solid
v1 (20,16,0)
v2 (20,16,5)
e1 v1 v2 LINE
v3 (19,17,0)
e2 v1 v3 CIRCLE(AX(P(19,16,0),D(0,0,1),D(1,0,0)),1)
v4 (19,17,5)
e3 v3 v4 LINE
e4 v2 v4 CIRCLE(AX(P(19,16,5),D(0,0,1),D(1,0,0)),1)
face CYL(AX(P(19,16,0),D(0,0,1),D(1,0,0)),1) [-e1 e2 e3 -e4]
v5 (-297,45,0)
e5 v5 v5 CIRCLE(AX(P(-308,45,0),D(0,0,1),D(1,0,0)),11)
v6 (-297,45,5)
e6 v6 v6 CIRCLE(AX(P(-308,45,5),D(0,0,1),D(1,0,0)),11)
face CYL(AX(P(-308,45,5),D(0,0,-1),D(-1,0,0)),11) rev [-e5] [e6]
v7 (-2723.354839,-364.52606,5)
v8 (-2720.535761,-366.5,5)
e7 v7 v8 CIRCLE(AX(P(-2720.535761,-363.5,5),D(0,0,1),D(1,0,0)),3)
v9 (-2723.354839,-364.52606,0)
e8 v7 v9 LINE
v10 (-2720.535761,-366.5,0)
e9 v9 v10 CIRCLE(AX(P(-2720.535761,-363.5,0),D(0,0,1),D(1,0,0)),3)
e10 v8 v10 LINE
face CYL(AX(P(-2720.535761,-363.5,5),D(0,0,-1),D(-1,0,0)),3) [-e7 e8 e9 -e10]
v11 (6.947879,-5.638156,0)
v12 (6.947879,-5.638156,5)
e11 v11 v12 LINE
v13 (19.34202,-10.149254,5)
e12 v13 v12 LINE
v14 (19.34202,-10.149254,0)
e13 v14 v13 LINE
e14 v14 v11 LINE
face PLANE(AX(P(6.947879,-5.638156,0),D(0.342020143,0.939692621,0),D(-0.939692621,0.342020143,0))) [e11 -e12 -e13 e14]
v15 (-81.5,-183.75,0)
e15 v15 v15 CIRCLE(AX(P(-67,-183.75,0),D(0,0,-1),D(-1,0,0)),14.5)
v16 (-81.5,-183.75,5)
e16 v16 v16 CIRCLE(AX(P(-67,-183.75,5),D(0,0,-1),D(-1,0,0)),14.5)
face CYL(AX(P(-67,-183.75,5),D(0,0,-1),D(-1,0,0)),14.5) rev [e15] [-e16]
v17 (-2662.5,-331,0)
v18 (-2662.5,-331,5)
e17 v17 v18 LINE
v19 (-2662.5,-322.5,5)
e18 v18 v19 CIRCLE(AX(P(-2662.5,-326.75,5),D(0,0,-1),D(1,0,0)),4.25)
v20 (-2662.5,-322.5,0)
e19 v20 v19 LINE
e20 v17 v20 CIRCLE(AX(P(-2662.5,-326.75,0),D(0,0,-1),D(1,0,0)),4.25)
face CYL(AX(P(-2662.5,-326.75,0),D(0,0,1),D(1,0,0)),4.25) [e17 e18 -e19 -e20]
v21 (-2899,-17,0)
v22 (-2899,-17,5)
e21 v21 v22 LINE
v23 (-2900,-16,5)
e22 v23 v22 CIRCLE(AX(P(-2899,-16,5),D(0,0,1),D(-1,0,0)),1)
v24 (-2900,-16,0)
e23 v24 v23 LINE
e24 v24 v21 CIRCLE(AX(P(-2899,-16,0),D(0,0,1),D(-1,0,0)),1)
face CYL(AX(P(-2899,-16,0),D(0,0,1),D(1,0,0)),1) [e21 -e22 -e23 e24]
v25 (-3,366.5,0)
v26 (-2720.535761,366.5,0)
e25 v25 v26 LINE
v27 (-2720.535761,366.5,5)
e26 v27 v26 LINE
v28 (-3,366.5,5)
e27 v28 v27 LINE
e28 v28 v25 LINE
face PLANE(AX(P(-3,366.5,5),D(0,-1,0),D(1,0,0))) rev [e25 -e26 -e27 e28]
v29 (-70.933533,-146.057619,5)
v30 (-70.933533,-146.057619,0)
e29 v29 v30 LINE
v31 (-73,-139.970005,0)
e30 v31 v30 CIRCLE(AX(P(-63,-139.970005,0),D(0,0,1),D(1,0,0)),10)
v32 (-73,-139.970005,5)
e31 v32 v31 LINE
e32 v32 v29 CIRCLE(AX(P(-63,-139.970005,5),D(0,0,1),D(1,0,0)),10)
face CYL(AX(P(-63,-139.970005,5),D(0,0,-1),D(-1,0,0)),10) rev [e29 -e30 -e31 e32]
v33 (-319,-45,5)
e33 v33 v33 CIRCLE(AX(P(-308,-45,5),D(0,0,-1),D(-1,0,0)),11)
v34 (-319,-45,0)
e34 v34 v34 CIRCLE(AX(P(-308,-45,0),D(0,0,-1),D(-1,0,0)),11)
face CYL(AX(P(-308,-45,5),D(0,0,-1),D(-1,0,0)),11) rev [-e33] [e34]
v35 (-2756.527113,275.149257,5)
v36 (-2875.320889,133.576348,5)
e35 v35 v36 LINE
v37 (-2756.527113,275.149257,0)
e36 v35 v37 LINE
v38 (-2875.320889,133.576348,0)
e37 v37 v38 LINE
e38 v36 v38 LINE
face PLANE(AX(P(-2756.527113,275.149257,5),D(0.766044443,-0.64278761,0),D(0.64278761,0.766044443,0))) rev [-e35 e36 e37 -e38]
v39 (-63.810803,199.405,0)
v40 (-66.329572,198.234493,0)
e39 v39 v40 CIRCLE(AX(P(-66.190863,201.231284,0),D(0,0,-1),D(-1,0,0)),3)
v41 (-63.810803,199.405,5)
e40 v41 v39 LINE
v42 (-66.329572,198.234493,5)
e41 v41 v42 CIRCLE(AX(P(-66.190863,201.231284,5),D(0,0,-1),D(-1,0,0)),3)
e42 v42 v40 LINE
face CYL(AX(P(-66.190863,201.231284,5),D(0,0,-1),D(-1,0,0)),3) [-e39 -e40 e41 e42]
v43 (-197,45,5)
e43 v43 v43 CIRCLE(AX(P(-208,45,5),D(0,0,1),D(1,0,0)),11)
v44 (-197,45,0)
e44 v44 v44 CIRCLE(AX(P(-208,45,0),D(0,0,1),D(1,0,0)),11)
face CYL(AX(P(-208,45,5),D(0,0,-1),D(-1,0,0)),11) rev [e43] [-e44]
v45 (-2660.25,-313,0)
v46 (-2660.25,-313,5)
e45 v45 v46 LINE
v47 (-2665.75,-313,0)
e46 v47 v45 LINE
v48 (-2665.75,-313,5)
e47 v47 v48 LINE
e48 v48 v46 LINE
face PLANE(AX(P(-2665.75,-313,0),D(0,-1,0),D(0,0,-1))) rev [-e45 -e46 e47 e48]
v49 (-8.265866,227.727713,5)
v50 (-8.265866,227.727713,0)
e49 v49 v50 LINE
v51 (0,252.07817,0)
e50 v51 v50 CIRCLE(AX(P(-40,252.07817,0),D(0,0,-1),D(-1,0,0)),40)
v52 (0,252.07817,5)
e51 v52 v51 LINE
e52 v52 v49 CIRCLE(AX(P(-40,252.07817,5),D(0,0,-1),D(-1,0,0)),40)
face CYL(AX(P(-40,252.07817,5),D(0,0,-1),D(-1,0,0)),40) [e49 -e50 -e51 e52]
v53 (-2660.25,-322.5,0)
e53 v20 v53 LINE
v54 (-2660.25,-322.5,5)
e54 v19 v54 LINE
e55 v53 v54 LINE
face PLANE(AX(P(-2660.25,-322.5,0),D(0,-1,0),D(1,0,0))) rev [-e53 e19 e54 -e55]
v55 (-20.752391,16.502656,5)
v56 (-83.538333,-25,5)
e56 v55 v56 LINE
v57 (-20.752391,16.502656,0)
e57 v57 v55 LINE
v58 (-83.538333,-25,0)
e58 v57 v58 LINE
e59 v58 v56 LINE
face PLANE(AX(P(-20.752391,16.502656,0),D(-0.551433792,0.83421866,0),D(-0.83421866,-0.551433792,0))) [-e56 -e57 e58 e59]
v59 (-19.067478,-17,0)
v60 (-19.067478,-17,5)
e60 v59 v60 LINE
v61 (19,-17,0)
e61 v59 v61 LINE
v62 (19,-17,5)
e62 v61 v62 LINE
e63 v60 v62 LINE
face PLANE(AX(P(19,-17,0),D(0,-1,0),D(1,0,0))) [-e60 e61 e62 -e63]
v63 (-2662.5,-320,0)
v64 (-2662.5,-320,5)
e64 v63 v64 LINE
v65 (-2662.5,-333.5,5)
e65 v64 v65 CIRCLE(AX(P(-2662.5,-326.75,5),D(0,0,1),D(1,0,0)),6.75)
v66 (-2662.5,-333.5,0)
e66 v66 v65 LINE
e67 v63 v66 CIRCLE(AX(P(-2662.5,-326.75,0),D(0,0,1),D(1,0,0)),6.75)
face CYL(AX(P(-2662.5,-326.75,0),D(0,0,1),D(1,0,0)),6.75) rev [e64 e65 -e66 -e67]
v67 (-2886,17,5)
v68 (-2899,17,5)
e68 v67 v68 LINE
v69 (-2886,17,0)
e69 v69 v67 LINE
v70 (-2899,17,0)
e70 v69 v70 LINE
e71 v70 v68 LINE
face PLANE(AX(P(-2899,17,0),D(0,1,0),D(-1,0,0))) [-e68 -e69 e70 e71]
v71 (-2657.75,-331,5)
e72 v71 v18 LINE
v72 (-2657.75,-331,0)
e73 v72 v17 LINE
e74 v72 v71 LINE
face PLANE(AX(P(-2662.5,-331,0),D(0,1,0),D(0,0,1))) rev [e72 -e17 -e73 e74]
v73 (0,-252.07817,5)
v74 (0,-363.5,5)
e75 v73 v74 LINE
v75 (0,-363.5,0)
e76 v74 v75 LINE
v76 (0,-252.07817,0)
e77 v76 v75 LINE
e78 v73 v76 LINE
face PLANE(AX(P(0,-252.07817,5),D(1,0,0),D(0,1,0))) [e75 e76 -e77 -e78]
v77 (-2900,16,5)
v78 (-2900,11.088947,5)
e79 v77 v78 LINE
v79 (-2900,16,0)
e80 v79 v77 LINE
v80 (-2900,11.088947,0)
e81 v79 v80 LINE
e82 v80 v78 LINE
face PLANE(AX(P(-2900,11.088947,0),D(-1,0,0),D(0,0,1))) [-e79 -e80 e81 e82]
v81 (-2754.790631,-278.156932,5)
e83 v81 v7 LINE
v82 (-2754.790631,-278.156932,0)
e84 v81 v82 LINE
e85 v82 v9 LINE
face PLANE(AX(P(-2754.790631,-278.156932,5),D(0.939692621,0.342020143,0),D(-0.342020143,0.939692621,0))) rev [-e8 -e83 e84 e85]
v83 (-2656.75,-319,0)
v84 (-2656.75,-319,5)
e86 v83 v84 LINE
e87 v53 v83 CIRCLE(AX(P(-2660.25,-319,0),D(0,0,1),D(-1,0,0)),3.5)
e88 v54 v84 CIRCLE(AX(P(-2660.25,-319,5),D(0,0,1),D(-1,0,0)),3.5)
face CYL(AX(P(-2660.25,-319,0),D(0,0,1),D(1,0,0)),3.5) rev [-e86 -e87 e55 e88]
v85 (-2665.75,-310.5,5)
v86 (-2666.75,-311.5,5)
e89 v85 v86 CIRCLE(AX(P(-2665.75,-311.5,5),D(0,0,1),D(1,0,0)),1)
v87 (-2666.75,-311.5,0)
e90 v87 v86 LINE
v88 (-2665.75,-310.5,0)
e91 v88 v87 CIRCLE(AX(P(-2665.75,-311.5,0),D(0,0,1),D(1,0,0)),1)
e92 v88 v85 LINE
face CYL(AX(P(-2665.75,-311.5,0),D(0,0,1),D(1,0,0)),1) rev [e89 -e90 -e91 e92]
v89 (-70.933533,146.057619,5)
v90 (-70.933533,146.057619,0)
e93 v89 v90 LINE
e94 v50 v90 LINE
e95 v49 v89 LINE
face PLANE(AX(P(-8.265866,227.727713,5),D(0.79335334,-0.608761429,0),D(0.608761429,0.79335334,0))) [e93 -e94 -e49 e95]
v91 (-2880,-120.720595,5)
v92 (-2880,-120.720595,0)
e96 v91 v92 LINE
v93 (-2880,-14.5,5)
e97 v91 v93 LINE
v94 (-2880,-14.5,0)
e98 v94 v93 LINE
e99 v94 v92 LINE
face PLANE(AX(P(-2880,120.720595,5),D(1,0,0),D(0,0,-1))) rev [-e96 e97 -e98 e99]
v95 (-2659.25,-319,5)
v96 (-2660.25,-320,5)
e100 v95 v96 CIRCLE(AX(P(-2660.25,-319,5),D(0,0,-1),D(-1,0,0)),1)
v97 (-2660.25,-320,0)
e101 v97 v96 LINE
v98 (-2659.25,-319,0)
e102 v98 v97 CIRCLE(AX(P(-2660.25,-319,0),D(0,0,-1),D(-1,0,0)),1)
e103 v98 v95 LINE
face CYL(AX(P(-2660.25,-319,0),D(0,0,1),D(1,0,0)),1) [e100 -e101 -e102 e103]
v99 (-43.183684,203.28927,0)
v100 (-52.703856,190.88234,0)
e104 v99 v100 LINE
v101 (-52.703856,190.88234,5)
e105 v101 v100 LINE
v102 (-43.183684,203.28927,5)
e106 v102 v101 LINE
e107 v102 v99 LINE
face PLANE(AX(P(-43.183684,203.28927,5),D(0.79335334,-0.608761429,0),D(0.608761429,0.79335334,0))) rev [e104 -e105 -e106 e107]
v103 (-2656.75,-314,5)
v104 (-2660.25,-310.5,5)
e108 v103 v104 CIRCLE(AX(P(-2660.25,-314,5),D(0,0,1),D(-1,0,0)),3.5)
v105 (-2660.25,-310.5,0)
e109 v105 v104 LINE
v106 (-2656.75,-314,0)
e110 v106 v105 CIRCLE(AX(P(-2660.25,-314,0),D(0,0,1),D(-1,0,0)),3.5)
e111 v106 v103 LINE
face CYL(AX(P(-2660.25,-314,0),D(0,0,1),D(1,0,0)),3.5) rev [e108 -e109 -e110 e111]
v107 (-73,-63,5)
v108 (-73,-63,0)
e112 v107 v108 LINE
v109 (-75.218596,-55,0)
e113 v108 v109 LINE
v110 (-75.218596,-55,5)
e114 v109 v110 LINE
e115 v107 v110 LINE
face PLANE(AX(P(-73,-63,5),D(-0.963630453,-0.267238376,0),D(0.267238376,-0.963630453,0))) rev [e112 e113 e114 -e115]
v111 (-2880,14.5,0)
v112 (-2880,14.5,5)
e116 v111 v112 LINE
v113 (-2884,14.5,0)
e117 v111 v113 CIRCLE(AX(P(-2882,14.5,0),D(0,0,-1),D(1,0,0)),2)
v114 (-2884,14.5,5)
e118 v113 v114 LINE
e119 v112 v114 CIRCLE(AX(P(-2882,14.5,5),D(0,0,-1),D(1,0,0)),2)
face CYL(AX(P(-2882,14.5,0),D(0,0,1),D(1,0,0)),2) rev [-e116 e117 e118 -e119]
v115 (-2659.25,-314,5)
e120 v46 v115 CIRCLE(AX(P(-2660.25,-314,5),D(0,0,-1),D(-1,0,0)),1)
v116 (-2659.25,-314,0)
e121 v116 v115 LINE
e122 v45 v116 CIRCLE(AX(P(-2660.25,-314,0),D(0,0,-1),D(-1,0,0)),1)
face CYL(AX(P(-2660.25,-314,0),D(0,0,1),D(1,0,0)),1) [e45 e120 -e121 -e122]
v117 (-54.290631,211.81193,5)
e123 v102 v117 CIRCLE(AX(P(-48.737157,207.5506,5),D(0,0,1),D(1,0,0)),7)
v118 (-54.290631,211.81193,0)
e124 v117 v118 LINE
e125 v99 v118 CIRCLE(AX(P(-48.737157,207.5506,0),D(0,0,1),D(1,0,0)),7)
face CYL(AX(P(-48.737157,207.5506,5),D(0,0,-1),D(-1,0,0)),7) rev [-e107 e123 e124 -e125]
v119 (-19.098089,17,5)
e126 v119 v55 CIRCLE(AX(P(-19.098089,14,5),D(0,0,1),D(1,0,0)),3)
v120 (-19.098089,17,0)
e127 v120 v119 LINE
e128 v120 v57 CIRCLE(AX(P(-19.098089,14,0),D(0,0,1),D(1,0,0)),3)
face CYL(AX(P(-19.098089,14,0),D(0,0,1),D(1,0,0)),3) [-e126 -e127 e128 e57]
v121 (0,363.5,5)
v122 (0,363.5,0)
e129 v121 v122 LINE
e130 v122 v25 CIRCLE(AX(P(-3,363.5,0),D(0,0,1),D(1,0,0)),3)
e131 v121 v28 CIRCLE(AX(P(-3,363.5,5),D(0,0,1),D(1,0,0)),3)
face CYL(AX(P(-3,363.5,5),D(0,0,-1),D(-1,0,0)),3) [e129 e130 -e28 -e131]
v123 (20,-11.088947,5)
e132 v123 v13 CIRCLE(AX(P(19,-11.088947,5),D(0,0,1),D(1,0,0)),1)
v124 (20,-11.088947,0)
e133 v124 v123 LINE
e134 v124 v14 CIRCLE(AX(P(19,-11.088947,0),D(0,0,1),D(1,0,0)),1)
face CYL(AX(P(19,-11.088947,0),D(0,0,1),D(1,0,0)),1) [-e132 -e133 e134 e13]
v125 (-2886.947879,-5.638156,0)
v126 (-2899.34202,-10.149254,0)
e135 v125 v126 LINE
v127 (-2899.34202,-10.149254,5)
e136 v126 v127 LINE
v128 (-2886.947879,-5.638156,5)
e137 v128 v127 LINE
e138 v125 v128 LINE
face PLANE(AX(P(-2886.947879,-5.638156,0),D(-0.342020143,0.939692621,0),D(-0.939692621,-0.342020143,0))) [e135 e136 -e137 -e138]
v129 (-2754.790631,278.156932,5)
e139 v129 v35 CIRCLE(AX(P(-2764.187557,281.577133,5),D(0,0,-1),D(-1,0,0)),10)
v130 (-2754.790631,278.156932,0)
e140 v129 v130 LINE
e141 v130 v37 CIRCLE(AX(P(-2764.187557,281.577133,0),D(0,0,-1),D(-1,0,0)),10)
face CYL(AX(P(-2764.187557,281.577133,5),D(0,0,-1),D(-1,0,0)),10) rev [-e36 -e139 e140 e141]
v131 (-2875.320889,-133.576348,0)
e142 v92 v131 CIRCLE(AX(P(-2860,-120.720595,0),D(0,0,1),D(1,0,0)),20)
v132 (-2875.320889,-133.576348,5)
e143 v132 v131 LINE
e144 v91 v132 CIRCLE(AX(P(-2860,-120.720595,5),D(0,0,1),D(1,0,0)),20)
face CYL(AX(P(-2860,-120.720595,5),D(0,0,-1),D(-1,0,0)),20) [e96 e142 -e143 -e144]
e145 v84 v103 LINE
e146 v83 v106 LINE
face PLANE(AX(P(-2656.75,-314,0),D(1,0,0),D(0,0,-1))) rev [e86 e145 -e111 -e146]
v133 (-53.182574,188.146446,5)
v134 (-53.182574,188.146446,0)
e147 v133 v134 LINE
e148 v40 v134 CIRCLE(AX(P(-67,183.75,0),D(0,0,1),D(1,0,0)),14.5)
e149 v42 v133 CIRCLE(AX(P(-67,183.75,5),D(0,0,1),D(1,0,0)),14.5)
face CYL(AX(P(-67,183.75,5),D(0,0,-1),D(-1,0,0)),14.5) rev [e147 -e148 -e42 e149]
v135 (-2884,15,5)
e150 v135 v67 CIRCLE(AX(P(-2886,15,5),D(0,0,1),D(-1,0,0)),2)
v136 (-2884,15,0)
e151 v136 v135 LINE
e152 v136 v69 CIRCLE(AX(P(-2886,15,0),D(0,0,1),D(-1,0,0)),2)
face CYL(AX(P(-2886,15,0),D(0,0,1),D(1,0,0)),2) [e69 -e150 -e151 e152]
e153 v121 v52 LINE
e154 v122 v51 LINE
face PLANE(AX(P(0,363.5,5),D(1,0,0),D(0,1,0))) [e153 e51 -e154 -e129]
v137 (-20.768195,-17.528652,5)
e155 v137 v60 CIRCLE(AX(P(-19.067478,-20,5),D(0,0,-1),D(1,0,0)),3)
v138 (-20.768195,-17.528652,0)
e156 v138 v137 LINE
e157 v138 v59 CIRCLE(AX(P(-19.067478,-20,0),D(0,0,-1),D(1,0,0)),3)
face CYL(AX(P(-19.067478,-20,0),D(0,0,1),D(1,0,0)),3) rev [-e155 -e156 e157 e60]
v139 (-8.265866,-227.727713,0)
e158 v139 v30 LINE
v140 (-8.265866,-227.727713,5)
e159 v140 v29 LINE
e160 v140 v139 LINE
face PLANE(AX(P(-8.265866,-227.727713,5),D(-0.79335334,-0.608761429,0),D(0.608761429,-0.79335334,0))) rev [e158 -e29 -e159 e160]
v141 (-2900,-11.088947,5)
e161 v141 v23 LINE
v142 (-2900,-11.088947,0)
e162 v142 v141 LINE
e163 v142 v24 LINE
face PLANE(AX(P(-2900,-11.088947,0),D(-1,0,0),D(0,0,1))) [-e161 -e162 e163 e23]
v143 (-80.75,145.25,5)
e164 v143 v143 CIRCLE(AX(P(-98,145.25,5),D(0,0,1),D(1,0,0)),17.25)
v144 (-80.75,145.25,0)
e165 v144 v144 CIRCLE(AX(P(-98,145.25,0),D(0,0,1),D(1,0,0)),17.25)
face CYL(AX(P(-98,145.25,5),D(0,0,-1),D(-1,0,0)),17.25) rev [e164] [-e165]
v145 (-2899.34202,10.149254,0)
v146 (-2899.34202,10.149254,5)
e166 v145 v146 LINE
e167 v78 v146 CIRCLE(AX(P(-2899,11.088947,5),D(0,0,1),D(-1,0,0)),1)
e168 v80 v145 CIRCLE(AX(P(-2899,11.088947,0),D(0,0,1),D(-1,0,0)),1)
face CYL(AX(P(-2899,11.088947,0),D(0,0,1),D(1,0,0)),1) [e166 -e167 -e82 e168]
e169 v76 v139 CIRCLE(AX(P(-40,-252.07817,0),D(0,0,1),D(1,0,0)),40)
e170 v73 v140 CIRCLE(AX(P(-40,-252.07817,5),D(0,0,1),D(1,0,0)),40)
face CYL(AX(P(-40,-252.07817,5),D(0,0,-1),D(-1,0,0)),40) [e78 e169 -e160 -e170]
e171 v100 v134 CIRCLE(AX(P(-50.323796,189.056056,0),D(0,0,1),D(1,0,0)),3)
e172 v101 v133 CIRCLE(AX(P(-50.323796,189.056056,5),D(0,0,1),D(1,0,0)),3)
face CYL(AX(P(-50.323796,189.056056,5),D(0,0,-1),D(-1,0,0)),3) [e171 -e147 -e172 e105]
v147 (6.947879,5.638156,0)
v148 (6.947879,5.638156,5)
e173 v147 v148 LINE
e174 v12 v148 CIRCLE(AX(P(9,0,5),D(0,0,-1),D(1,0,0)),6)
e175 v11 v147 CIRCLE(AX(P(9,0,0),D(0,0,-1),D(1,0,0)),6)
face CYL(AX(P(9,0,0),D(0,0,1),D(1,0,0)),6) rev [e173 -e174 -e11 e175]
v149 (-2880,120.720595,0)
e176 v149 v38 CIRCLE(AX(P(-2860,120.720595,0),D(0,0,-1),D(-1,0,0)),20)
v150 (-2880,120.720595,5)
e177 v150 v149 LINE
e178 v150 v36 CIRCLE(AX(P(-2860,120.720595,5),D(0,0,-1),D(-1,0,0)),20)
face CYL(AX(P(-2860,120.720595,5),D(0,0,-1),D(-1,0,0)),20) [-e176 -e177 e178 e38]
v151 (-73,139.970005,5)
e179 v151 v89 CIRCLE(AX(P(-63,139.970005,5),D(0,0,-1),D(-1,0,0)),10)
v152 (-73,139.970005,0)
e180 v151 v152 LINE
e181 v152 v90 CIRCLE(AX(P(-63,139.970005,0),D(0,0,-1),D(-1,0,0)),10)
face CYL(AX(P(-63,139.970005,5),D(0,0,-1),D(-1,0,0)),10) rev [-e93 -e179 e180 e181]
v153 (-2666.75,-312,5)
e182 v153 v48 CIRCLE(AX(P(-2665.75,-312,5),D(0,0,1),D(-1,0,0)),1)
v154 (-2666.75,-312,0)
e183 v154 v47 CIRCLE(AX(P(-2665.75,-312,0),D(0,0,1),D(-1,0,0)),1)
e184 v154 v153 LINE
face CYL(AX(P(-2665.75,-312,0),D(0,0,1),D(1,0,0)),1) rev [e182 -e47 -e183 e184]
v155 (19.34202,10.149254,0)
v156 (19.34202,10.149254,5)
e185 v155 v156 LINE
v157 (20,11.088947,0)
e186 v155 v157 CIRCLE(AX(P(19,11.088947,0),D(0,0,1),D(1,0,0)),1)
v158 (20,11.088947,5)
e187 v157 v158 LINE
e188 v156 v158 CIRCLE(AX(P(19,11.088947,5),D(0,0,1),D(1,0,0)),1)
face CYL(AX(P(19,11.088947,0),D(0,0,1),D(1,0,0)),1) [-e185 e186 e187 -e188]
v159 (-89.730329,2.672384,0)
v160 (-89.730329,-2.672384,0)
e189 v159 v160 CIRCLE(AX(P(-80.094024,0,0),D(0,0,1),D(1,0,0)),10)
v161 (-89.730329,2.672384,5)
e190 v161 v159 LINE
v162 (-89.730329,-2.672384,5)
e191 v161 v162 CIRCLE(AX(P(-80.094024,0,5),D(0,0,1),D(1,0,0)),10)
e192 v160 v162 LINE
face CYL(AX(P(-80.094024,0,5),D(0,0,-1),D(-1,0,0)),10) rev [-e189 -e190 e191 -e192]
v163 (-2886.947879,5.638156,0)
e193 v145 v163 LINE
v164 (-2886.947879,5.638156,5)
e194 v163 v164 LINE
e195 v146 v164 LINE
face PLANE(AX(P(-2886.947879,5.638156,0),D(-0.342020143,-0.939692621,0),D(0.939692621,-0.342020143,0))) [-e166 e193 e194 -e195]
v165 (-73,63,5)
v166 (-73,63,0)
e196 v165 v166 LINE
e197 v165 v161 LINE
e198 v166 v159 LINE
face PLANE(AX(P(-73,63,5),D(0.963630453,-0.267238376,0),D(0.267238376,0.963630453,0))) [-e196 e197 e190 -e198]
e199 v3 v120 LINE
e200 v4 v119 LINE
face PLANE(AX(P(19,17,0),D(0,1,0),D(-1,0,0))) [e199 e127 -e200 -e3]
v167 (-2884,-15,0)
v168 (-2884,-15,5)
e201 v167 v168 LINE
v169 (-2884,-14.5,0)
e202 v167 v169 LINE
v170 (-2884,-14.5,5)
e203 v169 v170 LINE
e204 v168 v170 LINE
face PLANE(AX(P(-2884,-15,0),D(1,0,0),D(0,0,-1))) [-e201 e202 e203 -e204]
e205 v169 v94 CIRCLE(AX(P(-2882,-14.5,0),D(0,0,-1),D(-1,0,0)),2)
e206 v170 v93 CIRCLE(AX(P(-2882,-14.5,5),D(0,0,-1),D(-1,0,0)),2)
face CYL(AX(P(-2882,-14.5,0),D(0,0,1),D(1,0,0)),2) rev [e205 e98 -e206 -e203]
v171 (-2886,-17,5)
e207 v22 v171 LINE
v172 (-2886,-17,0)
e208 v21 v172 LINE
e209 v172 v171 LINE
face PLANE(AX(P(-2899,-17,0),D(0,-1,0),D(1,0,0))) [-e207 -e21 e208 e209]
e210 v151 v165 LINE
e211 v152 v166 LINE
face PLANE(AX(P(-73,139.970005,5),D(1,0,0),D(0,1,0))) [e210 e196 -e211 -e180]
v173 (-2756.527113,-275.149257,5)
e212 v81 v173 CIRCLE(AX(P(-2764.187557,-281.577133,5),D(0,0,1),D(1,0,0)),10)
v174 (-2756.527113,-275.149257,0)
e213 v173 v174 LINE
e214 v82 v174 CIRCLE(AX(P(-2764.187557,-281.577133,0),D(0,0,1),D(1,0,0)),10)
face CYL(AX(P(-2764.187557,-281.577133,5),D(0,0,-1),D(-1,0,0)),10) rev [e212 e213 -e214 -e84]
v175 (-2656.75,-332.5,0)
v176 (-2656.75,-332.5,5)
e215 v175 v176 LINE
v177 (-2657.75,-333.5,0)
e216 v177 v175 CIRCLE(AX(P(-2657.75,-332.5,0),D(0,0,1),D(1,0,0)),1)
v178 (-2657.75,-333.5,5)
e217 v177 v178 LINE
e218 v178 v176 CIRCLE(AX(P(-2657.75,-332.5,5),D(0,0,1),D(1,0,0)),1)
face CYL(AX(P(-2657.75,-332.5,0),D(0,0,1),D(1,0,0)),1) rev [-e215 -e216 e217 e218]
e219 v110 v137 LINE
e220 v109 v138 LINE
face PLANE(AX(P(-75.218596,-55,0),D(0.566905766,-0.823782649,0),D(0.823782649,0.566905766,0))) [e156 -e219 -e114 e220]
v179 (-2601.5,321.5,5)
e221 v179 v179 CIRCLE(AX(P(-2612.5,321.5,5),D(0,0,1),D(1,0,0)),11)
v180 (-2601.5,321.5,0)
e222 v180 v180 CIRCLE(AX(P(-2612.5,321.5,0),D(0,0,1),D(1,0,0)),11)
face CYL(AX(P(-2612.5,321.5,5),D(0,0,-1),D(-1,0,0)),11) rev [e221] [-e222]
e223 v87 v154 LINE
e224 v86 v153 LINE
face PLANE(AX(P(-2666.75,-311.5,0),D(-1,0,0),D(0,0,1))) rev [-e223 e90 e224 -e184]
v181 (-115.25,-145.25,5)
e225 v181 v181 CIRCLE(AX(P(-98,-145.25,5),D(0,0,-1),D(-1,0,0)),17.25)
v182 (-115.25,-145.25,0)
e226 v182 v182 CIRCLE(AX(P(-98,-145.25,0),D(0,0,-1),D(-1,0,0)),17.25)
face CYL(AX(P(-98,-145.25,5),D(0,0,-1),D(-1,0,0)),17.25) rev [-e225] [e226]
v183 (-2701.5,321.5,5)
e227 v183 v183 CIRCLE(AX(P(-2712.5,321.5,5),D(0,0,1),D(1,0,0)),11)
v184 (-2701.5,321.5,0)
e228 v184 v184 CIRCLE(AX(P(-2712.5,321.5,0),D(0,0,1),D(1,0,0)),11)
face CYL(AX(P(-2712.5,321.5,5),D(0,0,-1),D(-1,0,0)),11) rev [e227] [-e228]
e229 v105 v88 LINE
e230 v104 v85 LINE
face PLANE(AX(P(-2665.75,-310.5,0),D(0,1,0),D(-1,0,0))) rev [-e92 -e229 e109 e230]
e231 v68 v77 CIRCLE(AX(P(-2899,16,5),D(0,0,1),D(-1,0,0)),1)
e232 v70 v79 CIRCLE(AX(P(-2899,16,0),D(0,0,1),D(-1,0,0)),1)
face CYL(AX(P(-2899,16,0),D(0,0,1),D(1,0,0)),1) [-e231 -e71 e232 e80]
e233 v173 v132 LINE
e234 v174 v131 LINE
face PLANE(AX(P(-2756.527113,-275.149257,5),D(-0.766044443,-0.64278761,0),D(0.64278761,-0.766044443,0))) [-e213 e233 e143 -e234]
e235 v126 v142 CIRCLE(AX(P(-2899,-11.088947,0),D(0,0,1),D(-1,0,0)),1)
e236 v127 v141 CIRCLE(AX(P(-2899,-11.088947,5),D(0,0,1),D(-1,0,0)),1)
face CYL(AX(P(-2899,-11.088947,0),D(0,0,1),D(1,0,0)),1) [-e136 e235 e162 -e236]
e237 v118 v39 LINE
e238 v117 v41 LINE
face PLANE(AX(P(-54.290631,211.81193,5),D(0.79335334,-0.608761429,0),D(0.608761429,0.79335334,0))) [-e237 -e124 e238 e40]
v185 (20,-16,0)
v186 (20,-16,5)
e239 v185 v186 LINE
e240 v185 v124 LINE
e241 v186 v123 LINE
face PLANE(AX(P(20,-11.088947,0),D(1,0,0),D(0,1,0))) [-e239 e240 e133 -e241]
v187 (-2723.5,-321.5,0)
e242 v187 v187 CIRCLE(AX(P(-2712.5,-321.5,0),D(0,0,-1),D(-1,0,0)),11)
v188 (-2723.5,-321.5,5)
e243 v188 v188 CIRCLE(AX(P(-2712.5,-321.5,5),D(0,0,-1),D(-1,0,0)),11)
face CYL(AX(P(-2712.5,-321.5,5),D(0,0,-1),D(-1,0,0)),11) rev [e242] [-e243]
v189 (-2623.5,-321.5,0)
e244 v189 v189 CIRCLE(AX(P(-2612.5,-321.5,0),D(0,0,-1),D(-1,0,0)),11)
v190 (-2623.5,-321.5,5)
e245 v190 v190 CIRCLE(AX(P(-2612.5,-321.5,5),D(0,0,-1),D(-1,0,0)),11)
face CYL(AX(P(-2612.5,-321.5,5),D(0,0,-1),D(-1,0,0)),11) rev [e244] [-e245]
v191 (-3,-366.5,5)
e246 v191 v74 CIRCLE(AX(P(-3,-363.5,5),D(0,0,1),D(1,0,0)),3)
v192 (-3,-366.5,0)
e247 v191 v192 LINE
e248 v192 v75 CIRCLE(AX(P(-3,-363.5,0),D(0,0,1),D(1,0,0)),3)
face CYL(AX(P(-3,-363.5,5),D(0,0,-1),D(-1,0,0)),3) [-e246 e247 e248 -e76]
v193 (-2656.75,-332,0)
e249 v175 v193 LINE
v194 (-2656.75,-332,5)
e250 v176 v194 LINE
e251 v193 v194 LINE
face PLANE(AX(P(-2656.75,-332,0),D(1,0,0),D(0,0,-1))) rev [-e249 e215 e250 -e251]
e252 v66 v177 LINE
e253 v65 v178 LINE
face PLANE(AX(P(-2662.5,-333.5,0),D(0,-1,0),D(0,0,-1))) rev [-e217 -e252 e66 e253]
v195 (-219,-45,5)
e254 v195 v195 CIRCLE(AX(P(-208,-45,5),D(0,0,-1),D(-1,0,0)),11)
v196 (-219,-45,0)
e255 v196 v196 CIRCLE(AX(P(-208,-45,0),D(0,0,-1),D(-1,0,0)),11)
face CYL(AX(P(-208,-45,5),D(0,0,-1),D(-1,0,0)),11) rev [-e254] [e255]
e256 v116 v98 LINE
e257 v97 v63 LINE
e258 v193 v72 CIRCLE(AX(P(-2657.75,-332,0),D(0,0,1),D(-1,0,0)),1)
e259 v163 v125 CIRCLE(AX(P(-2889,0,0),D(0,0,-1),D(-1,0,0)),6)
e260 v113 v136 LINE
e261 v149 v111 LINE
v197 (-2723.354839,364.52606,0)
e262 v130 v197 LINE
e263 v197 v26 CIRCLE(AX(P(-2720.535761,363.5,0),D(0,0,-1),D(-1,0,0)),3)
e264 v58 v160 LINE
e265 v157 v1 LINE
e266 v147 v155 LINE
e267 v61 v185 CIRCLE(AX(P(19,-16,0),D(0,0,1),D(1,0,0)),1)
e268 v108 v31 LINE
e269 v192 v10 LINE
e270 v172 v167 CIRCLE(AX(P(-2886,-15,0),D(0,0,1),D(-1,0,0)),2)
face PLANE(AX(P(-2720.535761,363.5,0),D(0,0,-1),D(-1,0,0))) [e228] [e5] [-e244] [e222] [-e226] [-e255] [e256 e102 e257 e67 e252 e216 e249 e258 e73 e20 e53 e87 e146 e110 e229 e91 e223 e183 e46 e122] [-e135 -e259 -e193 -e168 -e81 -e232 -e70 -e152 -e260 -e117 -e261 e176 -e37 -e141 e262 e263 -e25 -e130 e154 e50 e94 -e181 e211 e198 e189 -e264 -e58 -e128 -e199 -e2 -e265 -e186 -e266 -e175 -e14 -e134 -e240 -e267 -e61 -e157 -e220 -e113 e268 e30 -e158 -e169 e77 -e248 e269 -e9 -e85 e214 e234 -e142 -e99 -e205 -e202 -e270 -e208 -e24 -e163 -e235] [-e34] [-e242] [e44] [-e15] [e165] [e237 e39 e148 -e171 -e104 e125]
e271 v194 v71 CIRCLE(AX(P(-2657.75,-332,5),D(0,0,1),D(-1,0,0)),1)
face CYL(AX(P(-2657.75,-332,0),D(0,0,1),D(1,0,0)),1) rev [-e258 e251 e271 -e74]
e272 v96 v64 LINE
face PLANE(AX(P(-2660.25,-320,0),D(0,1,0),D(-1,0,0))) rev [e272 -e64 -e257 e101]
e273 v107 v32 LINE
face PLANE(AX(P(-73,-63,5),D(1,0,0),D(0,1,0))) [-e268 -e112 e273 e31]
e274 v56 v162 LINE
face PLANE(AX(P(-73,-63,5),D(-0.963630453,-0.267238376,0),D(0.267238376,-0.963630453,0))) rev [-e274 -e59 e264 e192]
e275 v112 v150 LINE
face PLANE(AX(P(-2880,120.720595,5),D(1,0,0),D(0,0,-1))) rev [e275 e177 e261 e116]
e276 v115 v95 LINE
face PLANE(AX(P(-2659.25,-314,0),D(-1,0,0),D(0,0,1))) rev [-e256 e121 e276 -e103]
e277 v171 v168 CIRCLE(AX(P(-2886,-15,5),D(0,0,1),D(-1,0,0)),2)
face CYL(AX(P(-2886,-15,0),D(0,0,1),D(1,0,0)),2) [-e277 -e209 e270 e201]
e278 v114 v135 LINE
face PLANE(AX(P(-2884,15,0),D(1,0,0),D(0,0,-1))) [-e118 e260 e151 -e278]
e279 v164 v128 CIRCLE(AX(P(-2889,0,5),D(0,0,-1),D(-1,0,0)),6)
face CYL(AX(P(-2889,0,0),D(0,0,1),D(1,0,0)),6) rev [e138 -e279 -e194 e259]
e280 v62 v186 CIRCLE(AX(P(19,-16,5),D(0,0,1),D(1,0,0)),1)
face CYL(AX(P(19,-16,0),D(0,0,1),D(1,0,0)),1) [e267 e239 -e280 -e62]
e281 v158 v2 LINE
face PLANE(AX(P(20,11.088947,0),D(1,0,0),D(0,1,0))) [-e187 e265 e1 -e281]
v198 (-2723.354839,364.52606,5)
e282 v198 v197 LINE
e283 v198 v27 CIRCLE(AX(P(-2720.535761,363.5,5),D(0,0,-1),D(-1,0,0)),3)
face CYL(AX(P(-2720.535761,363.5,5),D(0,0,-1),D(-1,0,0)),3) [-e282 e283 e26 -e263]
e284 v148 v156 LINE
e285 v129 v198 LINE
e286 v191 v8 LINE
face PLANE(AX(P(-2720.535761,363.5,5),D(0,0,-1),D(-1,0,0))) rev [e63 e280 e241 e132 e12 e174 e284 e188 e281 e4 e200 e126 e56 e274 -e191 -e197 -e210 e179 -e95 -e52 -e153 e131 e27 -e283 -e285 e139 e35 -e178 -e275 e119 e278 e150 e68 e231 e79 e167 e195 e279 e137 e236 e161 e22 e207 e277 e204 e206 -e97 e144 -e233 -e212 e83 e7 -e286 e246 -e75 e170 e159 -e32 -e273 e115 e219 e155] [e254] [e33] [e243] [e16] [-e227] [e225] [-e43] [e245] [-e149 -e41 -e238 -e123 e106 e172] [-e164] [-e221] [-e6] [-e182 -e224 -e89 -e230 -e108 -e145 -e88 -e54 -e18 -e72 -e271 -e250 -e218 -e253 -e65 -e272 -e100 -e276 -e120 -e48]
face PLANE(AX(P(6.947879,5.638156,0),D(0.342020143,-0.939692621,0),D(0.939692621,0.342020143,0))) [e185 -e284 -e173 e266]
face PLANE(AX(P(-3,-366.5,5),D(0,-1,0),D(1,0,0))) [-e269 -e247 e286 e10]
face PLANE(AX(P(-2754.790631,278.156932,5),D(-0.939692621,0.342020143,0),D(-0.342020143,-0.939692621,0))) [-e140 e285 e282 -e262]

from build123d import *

# Parameters (mm, degrees)
SKETCH1_R                      = 17.25
SKETCH1_R_2                    = 11
SKETCH1_R_3                    = 14.5
BASE_EXTRUDE_DEPTH             = 5
F_5_TAL_DEPTH                  = 2924.07154377
SKETCH2_OUTSIDE_W              = 3524.12
SKETCH2_OUTSIDE_H              = 1337.12
BORTSK_RING_AF_BUKKESTOP_DEPTH = 5
FARINA_BUKKESTOPS_DEPTH        = 5


with BuildPart() as part:
    # Sketch1 → Base-Extrude (new body)
    with BuildSketch(Plane.XY):
        with BuildLine():
            Line((0, 363.5), (0, 252.078170355))
            ThreePointArc((0, 252.078170355), (-2.12279482, 239.220591742), (-8.265866388, 227.727713194))
            Line((-8.265866388, 227.727713194), (-70.933533403, 146.057619484))
            ThreePointArc((-70.933533403, 146.057619484), (-72.469301295, 143.184399847), (-73, 139.970005194))
            Line((-73, 139.970005194), (-73, 63))
            Line((-73, 63), (-89.730328668, 2.672383761))
            ThreePointArc((-89.730328668, 2.672383761), (-90.00268311, 1.348509303), (-90.094024136, 0))
            Line((-90.094024136, 0), (17, 0))
            ThreePointArc((17, 0), (19.121320344, -0.878679656), (20, -3))
            Line((20, -3), (20, -17.437757944))
            ThreePointArc((20, -17.437757944), (19.281217897, -19.386102089), (17.469303395, -20.400822965))
            Line((17.469303395, -20.400822965), (-80.510157999, -35.919245122))
            Line((-80.510157999, -35.919245122), (-73, -63))
            Line((-73, -63), (-73, -139.970005194))
            ThreePointArc((-73, -139.970005194), (-72.469301295, -143.184399847), (-70.933533403, -146.057619484))
            Line((-70.933533403, -146.057619484), (-8.265866388, -227.727713194))
            ThreePointArc((-8.265866388, -227.727713194), (-2.12279482, -239.220591742), (0, -252.078170355))
            Line((0, -252.078170355), (0, -363.5))
            ThreePointArc((0, -363.5), (-0.878679656, -365.621320344), (-3, -366.5))
            Line((-3, -366.5), (-2720.535761072, -366.5))
            ThreePointArc((-2720.535761072, -366.5), (-2722.256490381, -365.957456133), (-2723.354838934, -364.52606043))
            Line((-2723.354838934, -364.52606043), (-2754.790630978, -278.156931626))
            ThreePointArc((-2754.790630978, -278.156931626), (-2755.527303148, -276.577133059), (-2756.527112755, -275.149256963))
            Line((-2756.527112755, -275.149256963), (-2875.320888862, -133.576347508))
            ThreePointArc((-2875.320888862, -133.576347508), (-2878.793852416, -127.560998181), (-2880, -120.720595315))
            Line((-2880, -120.720595315), (-2880, -22.342329219))
            ThreePointArc((-2880, -22.342329219), (-2880.635383686, -20.496092591), (-2882.272393125, -19.431901719))
            Line((-2882.272393125, -19.431901719), (-2897.727606875, -15.568098281))
            ThreePointArc((-2897.727606875, -15.568098281), (-2899.364616314, -14.503907409), (-2900, -12.657670781))
            Line((-2900, -12.657670781), (-2900, -3))
            ThreePointArc((-2900, -3), (-2899.121320344, -0.878679656), (-2897, 0))
            Line((-2897, 0), (-2892.062257748, 0))
            ThreePointArc((-2892.062257748, 0), (-2889.427026365, -0.750817072), (-2887.583225666, -2.777777778))
            ThreePointArc((-2887.583225666, -2.777777778), (-2883.087011135, -4.894412835), (-2880, -1))
            Line((-2880, -1), (-2880, 0))
            Line((-2880, 0), (-2880, 120.720595315))
            ThreePointArc((-2880, 120.720595315), (-2878.793852416, 127.560998181), (-2875.320888862, 133.576347508))
            Line((-2875.320888862, 133.576347508), (-2756.527112755, 275.149256963))
            ThreePointArc((-2756.527112755, 275.149256963), (-2755.527303148, 276.577133059), (-2754.790630978, 278.156931626))
            Line((-2754.790630978, 278.156931626), (-2723.354838934, 364.52606043))
            ThreePointArc((-2723.354838934, 364.52606043), (-2722.256490381, 365.957456133), (-2720.535761072, 366.5))
            Line((-2720.535761072, 366.5), (-3, 366.5))
            ThreePointArc((-3, 366.5), (-0.878679656, 365.621320344), (0, 363.5))
        make_face()
        with Locations((-98, 145.25)):
            Circle(SKETCH1_R, mode=Mode.SUBTRACT)
        with Locations((-2712.5, 321.5)):
            Circle(SKETCH1_R_2, mode=Mode.SUBTRACT)
        with Locations((-2612.5, 321.5)):
            Circle(SKETCH1_R_2, mode=Mode.SUBTRACT)
        with Locations(Location((-2612.5, -321.5, 0), (0, 0, 180))):
            Circle(SKETCH1_R_2, mode=Mode.SUBTRACT)
        with Locations(Location((-2712.5, -321.5, 0), (0, 0, 180))):
            Circle(SKETCH1_R_2, mode=Mode.SUBTRACT)
        with Locations(Location((-98, -145.25, 0), (0, 0, 180))):
            Circle(SKETCH1_R, mode=Mode.SUBTRACT)
        with Locations(Location((-67, -183.75, 0), (0, 0, 180))):
            Circle(SKETCH1_R_3, mode=Mode.SUBTRACT)
        with Locations((-308, 45)):
            Circle(SKETCH1_R_2, mode=Mode.SUBTRACT)
        with Locations((-208, 45)):
            Circle(SKETCH1_R_2, mode=Mode.SUBTRACT)
        with Locations(Location((-308, -45, 0), (0, 0, 180))):
            Circle(SKETCH1_R_2, mode=Mode.SUBTRACT)
        with Locations(Location((-208, -45, 0), (0, 0, 180))):
            Circle(SKETCH1_R_2, mode=Mode.SUBTRACT)
        with BuildLine():
            Line((-43.183683748, 203.289270206), (-52.703856204, 190.882339907))
            ThreePointArc((-52.703856204, 190.882339907), (-53.278899256, 189.573129916), (-53.18257398, 188.146446085))
            ThreePointArc((-53.18257398, 188.146446085), (-75.827040721, 172.246376566), (-66.329572191, 198.234492623))
            ThreePointArc((-66.329572191, 198.234492623), (-64.926570616, 198.510702498), (-63.810802968, 199.404999913))
            Line((-63.810802968, 199.404999913), (-54.290630512, 211.811930212))
            ThreePointArc((-54.290630512, 211.811930212), (-44.475827127, 213.104073591), (-43.183683748, 203.289270206))
        make_face(mode=Mode.SUBTRACT)
    extrude(amount=BASE_EXTRUDE_DEPTH)

    # Sketch5 → 5 tal (cut, through all)
    with BuildSketch(Plane.XY.offset(5)):
        with BuildLine():
            Line((-2665.75, -313), (-2660.25, -313))
            ThreePointArc((-2660.25, -313), (-2659.542893219, -313.292893219), (-2659.25, -314))
            Line((-2659.25, -314), (-2659.25, -319))
            ThreePointArc((-2659.25, -319), (-2659.542893219, -319.707106781), (-2660.25, -320))
            Line((-2660.25, -320), (-2662.5, -320))
            ThreePointArc((-2662.5, -320), (-2669.25, -326.75), (-2662.5, -333.5))
            Line((-2662.5, -333.5), (-2657.75, -333.5))
            ThreePointArc((-2657.75, -333.5), (-2657.042893219, -333.207106781), (-2656.75, -332.5))
            Line((-2656.75, -332.5), (-2656.75, -332))
            ThreePointArc((-2656.75, -332), (-2657.042893219, -331.292893219), (-2657.75, -331))
            Line((-2657.75, -331), (-2662.5, -331))
            ThreePointArc((-2662.5, -331), (-2666.75, -326.75), (-2662.5, -322.5))
            Line((-2662.5, -322.5), (-2660.25, -322.5))
            ThreePointArc((-2660.25, -322.5), (-2657.775126266, -321.474873734), (-2656.75, -319))
            Line((-2656.75, -319), (-2656.75, -314))
            ThreePointArc((-2656.75, -314), (-2657.775126266, -311.525126266), (-2660.25, -310.5))
            Line((-2660.25, -310.5), (-2665.75, -310.5))
            ThreePointArc((-2665.75, -310.5), (-2666.457106781, -310.792893219), (-2666.75, -311.5))
            Line((-2666.75, -311.5), (-2666.75, -312))
            ThreePointArc((-2666.75, -312), (-2666.457106781, -312.707106781), (-2665.75, -313))
        make_face()
    extrude(amount=-F_5_TAL_DEPTH, mode=Mode.SUBTRACT)

    # Sketch2 outside → Bortskæring af bukkestop (cut)
    with BuildSketch(Plane.XY.offset(5)):
        with Locations((-1440, 0)):
            Rectangle(SKETCH2_OUTSIDE_W, SKETCH2_OUTSIDE_H)
        with BuildLine():
            Line((0, -524.643652554), (-2880, -524.643652554))
            Line((-2880, -524.643652554), (-2880, 479.359658705))
            Line((-2880, 479.359658705), (0, 479.359658705))
            Line((0, 479.359658705), (0, 139.970005194))
            Line((0, 139.970005194), (-73, 139.970005194))
            Line((-73, 139.970005194), (-73, 63))
            Line((-73, 63), (-89.730328668, 2.672383761))
            ThreePointArc((-89.730328668, 2.672383761), (-90.094024136, 0), (-89.730328668, -2.672383761))
            Line((-89.730328668, -2.672383761), (-73, -63))
            Line((-73, -63), (-73, -139.970005194))
            Line((-73, -139.970005194), (0, -139.970005194))
            Line((0, -139.970005194), (0, -524.643652554))
        make_face(mode=Mode.SUBTRACT)
    extrude(amount=-BORTSK_RING_AF_BUKKESTOP_DEPTH, mode=Mode.SUBTRACT)

    # Sketch6 → Farina bukkestops (add)
    with BuildSketch(Plane.XY.offset(5)):
        with BuildLine():
            Line((-2886.94787914, 5.638155725), (-2899.342020143, 10.149254129))
            ThreePointArc((-2899.342020143, 10.149254129), (-2899.819152044, 10.515370314), (-2900, 11.08894675))
            Line((-2900, 11.08894675), (-2900, 16))
            ThreePointArc((-2900, 16), (-2899.707106781, 16.707106781), (-2899, 17))
            Line((-2899, 17), (-2886, 17))
            ThreePointArc((-2886, 17), (-2884.585786438, 16.414213562), (-2884, 15))
            Line((-2884, 15), (-2884, 14.5))
            ThreePointArc((-2884, 14.5), (-2882, 12.5), (-2880, 14.5))
            Line((-2880, 14.5), (-2880, -14.5))
            ThreePointArc((-2880, -14.5), (-2882, -12.5), (-2884, -14.5))
            Line((-2884, -14.5), (-2884, -15))
            ThreePointArc((-2884, -15), (-2884.585786438, -16.414213562), (-2886, -17))
            Line((-2886, -17), (-2899, -17))
            ThreePointArc((-2899, -17), (-2899.707106781, -16.707106781), (-2900, -16))
            Line((-2900, -16), (-2900, -11.08894675))
            ThreePointArc((-2900, -11.08894675), (-2899.819152044, -10.515370314), (-2899.342020143, -10.149254129))
            Line((-2899.342020143, -10.149254129), (-2886.94787914, -5.638155725))
            ThreePointArc((-2886.94787914, -5.638155725), (-2883, 0), (-2886.94787914, 5.638155725))
        make_face()
        with BuildLine():
            Line((6.94787914, 5.638155725), (19.342020143, 10.149254129))
            ThreePointArc((19.342020143, 10.149254129), (19.819152044, 10.515370314), (20, 11.08894675))
            Line((20, 11.08894675), (20, 16))
            ThreePointArc((20, 16), (19.707106781, 16.707106781), (19, 17))
            Line((19, 17), (-19.098089332, 17))
            ThreePointArc((-19.098089332, 17), (-19.961811527, 16.87297476), (-20.752390709, 16.502655981))
            Line((-20.752390709, 16.502655981), (-83.538332674, -25))
            Line((-83.538332674, -25), (-75.218596352, -55))
            Line((-75.218596352, -55), (-20.768195378, -17.528652053))
            ThreePointArc((-20.768195378, -17.528652053), (-19.957971247, -17.135209969), (-19.06747808, -17))
            Line((-19.06747808, -17), (19, -17))
            ThreePointArc((19, -17), (19.707106781, -16.707106781), (20, -16))
            Line((20, -16), (20, -11.08894675))
            ThreePointArc((20, -11.08894675), (19.819152044, -10.515370314), (19.342020143, -10.149254129))
            Line((19.342020143, -10.149254129), (6.94787914, -5.638155725))
            ThreePointArc((6.94787914, -5.638155725), (3, 0), (6.94787914, 5.638155725))
        make_face()
    extrude(amount=-FARINA_BUKKESTOPS_DEPTH)


solid = part.part
